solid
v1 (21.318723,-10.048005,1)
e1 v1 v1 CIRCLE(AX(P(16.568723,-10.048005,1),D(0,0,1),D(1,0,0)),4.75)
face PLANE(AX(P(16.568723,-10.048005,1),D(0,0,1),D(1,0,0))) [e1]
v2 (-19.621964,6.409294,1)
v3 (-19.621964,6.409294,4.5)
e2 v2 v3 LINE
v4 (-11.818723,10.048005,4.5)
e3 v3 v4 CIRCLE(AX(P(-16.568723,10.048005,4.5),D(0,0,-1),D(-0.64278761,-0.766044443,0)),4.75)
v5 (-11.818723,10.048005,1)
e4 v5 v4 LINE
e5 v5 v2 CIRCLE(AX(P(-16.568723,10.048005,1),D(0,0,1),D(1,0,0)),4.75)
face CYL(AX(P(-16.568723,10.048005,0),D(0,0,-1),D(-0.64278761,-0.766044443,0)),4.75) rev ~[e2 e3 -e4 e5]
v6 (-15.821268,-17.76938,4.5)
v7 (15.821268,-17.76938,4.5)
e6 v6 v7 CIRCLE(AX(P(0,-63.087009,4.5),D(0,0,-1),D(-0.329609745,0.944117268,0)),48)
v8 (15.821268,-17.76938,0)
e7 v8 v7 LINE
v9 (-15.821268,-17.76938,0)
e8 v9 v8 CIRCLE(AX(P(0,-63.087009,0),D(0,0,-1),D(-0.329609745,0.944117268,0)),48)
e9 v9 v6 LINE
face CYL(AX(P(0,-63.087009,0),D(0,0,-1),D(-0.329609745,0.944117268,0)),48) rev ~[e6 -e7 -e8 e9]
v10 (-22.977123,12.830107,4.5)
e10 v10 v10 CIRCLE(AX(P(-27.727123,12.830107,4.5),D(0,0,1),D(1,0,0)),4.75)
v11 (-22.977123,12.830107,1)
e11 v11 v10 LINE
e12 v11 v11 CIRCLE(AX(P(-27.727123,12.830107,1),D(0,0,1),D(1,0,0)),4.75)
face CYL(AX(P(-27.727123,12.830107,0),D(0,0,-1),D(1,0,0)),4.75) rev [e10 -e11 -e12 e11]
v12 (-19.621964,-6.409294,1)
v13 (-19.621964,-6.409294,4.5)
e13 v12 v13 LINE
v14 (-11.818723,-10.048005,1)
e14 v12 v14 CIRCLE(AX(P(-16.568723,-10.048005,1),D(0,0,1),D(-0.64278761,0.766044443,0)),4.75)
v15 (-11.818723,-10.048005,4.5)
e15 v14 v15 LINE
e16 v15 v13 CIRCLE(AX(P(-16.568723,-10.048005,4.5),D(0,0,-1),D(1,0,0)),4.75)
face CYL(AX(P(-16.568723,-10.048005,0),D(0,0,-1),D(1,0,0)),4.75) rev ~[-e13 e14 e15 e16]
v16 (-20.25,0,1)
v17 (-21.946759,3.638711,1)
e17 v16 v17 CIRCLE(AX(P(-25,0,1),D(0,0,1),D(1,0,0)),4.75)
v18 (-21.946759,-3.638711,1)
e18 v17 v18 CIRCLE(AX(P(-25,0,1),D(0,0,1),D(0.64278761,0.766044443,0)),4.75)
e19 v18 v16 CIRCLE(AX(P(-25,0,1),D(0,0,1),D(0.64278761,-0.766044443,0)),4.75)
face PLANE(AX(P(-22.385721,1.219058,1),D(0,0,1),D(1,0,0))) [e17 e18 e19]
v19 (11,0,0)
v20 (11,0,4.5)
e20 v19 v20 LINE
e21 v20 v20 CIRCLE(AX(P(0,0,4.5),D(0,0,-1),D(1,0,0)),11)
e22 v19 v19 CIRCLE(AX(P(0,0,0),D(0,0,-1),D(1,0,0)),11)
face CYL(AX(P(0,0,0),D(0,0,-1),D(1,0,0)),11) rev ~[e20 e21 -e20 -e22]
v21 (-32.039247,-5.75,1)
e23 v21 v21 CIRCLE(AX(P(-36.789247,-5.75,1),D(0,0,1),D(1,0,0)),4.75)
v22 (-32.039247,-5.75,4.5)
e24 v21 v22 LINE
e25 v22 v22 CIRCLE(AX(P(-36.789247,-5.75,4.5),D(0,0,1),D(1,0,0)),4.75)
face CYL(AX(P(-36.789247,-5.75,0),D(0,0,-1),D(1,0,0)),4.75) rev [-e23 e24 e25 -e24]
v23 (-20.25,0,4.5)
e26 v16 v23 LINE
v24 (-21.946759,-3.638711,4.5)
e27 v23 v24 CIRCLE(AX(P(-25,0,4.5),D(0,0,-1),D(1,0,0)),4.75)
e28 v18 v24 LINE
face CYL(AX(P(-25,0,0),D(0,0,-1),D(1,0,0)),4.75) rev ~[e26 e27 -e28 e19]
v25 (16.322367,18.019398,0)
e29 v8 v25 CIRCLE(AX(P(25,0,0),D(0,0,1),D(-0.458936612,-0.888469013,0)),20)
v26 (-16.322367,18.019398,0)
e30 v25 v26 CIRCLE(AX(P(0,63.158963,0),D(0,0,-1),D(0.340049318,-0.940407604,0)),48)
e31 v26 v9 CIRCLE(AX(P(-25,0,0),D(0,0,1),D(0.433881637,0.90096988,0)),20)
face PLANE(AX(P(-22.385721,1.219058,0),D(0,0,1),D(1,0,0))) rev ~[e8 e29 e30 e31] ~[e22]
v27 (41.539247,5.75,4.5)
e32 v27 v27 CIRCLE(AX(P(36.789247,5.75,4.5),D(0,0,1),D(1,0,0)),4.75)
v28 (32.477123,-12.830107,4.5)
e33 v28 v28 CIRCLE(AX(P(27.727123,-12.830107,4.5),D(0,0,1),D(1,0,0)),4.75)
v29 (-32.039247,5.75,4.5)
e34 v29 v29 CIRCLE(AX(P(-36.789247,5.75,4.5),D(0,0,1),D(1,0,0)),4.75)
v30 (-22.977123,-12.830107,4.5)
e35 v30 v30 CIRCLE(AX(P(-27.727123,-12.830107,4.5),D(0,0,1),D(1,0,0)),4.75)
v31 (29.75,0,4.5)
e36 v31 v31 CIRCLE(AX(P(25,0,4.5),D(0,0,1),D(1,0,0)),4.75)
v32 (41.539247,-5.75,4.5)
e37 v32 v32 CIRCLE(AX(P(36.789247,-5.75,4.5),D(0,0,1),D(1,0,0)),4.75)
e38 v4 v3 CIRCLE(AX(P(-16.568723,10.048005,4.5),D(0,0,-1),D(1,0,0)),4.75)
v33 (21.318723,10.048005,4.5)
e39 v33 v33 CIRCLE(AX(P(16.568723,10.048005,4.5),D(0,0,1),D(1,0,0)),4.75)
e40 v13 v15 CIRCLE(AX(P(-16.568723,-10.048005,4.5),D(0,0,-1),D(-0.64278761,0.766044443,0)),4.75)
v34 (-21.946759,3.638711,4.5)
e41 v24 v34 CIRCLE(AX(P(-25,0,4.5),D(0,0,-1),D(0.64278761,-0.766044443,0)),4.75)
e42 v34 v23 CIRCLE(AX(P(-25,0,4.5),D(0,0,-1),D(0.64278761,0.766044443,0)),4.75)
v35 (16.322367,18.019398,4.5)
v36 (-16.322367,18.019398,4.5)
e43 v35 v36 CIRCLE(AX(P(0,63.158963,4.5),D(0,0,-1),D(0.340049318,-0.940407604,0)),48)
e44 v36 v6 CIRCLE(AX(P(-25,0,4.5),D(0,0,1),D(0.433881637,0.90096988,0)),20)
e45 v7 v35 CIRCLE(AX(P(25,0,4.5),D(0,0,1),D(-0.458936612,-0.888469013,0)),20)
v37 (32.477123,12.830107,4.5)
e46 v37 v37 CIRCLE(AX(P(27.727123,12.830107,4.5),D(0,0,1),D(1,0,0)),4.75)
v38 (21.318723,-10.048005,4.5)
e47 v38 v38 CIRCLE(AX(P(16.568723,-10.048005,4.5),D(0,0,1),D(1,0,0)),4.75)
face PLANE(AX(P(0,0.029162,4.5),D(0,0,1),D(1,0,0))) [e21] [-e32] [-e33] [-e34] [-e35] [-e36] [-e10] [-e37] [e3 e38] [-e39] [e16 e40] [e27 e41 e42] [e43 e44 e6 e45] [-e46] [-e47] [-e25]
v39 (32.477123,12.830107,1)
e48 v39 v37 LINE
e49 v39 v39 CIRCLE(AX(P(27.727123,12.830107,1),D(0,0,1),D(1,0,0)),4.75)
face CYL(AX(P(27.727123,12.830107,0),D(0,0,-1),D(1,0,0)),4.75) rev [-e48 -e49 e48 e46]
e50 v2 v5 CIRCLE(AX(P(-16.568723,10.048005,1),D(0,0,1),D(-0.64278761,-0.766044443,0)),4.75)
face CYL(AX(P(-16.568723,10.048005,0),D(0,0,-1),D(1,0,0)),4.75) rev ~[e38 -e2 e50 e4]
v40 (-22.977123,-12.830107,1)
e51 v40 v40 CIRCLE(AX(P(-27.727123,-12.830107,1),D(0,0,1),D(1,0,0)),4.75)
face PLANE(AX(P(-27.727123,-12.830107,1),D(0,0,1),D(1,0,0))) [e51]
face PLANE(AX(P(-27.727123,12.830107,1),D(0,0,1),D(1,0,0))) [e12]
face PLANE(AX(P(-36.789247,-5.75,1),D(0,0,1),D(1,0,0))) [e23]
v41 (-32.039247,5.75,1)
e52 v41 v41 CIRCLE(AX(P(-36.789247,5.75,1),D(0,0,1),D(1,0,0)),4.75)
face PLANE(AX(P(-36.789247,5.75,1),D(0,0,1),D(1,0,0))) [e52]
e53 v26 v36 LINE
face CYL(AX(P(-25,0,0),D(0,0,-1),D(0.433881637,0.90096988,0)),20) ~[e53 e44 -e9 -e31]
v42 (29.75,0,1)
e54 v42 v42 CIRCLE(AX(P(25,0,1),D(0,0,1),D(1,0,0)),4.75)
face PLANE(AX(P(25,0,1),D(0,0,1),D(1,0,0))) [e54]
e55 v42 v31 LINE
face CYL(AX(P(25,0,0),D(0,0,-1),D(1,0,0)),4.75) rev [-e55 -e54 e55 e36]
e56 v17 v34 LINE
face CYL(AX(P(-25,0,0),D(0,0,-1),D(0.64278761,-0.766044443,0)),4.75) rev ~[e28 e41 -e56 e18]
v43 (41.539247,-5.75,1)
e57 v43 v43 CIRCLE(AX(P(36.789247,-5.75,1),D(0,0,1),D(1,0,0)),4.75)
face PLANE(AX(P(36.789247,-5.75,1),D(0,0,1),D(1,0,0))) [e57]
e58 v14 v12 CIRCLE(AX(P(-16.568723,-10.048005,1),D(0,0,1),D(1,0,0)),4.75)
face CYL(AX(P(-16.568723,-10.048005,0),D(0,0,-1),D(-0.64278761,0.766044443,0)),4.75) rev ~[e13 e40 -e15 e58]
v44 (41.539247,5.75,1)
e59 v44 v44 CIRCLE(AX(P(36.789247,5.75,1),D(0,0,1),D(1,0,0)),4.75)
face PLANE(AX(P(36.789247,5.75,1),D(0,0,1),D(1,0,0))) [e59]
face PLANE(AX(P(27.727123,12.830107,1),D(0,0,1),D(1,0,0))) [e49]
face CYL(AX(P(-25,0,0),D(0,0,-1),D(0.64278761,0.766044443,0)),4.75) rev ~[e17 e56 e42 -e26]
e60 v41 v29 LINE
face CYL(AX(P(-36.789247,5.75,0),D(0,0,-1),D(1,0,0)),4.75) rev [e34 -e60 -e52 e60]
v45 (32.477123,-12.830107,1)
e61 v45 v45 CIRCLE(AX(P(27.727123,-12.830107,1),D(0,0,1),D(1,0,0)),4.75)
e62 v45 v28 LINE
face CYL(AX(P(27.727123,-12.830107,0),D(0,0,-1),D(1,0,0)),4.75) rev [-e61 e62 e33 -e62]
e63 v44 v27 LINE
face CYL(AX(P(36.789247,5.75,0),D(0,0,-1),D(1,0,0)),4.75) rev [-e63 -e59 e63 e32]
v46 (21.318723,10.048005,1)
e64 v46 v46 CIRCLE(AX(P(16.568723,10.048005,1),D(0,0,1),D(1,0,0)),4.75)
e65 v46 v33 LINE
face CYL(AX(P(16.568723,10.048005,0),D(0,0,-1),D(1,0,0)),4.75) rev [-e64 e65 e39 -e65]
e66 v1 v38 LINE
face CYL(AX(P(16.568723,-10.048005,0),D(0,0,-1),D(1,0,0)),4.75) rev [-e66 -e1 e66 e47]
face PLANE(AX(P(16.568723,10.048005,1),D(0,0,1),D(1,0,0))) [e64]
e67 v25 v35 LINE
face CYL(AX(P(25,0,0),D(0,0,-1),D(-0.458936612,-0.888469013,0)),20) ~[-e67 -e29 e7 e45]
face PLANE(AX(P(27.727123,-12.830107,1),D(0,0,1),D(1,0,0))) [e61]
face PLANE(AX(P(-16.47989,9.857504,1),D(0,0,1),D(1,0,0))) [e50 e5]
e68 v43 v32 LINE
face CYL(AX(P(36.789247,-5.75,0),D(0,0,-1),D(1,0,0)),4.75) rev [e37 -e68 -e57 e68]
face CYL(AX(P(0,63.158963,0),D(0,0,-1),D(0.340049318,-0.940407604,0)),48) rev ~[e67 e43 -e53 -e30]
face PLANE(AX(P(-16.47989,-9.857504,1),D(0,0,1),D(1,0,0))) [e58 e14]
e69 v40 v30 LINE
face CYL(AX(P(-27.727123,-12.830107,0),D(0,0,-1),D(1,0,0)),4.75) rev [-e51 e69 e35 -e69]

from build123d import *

# Parameters (mm, degrees)
F0_R     = 4.75
F1_DEPTH = 4.5
F2_DEPTH = 1


# Not quite as in the source:
# - a feature names something its author has since deleted; it is built from what else it names


with BuildPart() as f1:
    # F0 (on Top) → F1 (new body)
    with BuildSketch(Plane.XY):
        with BuildLine():
            ThreePointArc((-15.8212677669, -17.7693802535), (0, -15.0870091218), (15.8212677669, -17.7693802535))
            ThreePointArc((15.8212677669, -17.7693802535), (44.9980398453, -0.2800041916), (16.3223672692, 18.019397609))
            ThreePointArc((16.3223672692, 18.019397609), (0, 15.1589625906), (-16.3223672692, 18.019397609))
            ThreePointArc((-16.3223672692, 18.019397609), (-44.9980398453, -0.2800041916), (-15.8212677669, -17.7693802535))
        make_face()
        with Locations((-27.7271234226, -12.8301069662)):
            Circle(F0_R, mode=Mode.SUBTRACT)
        with BuildLine():
            ThreePointArc((-11.8187225704, -10.0480051668), (-18.5761593137, -14.3529671553), (-19.6219637164, -6.409294062))
            ThreePointArc((-19.6219637164, -6.409294062), (-14.5612858272, -5.7430431784), (-11.8187225704, -10.0480051668))
        make_face(mode=Mode.SUBTRACT)
        with Locations((-36.7892470891, -5.75)):
            Circle(F0_R, mode=Mode.SUBTRACT)
        with Locations((16.5687225704, -10.0480051668)):
            Circle(F0_R, mode=Mode.SUBTRACT)
        with Locations((27.7271234226, -12.8301069662)):
            Circle(F0_R, mode=Mode.SUBTRACT)
        with Locations((36.7892470891, -5.75)):
            Circle(F0_R, mode=Mode.SUBTRACT)
        with BuildLine():
            ThreePointArc((-21.946758854, 3.6387111048), (-20.6950380116, 2.0074367433), (-20.25, 0))
            ThreePointArc((-20.25, 0), (-20.6950380116, -2.0074367433), (-21.946758854, -3.6387111048))
            ThreePointArc((-21.946758854, -3.6387111048), (-29.75, 0), (-21.946758854, 3.6387111048))
        make_face(mode=Mode.SUBTRACT)
        with Locations((-36.7892470891, 5.75)):
            Circle(F0_R, mode=Mode.SUBTRACT)
        with Locations((-27.7271234226, 12.8301069662)):
            Circle(F0_R, mode=Mode.SUBTRACT)
        with BuildLine():
            ThreePointArc((-11.8187225704, 10.0480051668), (-14.5612858272, 5.7430431784), (-19.6219637164, 6.409294062))
            ThreePointArc((-19.6219637164, 6.409294062), (-18.5761593137, 14.3529671553), (-11.8187225704, 10.0480051668))
        make_face(mode=Mode.SUBTRACT)
        with BuildLine():
            ThreePointArc((-11, 0), (0, 11), (11, 0))
            ThreePointArc((11, 0), (0, -11), (-11, 0))
        make_face(mode=Mode.SUBTRACT)
        with Locations((25, 0)):
            Circle(F0_R, mode=Mode.SUBTRACT)
        with Locations((36.7892470891, 5.75)):
            Circle(F0_R, mode=Mode.SUBTRACT)
        with Locations((16.5687225704, 10.0480051668)):
            Circle(F0_R, mode=Mode.SUBTRACT)
        with Locations((27.7271234226, 12.8301069662)):
            Circle(F0_R, mode=Mode.SUBTRACT)
    extrude(amount=F1_DEPTH)

    # F0 (on Top) → F2 (join)
    with BuildSketch(Plane.XY):
        with BuildLine():
            Line((-25, 0), (-20.25, 0))
            ThreePointArc((-20.25, 0), (-20.6950380116, 2.0074367433), (-21.946758854, 3.6387111048))
            Line((-21.946758854, 3.6387111048), (-25, 0))
        make_face()
        with BuildLine():
            Line((-25, 0), (-21.946758854, 3.6387111048))
            ThreePointArc((-21.946758854, 3.6387111048), (-29.75, 0), (-21.946758854, -3.6387111048))
            Line((-21.946758854, -3.6387111048), (-25, 0))
        make_face()
        with BuildLine():
            ThreePointArc((-21.946758854, -3.6387111048), (-20.6950380116, -2.0074367433), (-20.25, 0))
            Line((-20.25, 0), (-25, 0))
            Line((-25, 0), (-21.946758854, -3.6387111048))
        make_face()
        with Locations((25, 0)):
            Circle(F0_R)
        with BuildLine():
            ThreePointArc((-11.8187225704, 10.0480051668), (-18.5761593137, 14.3529671553), (-19.6219637164, 6.409294062))
            ThreePointArc((-19.6219637164, 6.409294062), (-14.5612858272, 5.7430431784), (-11.8187225704, 10.0480051668))
        make_face()
        with Locations((-27.7271234226, 12.8301069662)):
            Circle(F0_R)
        with Locations((-36.7892470891, 5.75)):
            Circle(F0_R)
        with Locations((-36.7892470891, -5.75)):
            Circle(F0_R)
        with Locations((-27.7271234226, -12.8301069662)):
            Circle(F0_R)
        with BuildLine():
            ThreePointArc((-11.8187225704, -10.0480051668), (-14.5612858272, -5.7430431784), (-19.6219637164, -6.409294062))
            ThreePointArc((-19.6219637164, -6.409294062), (-18.5761593137, -14.3529671553), (-11.8187225704, -10.0480051668))
        make_face()
        with Locations((16.5687225704, 10.0480051668)):
            Circle(F0_R)
        with Locations((27.7271234226, 12.8301069662)):
            Circle(F0_R)
        with Locations((36.7892470891, 5.75)):
            Circle(F0_R)
        with Locations((36.7892470891, -5.75)):
            Circle(F0_R)
        with Locations((27.7271234226, -12.8301069662)):
            Circle(F0_R)
        with Locations((16.5687225704, -10.0480051668)):
            Circle(F0_R)
    extrude(amount=F2_DEPTH)


solid = f1.part
